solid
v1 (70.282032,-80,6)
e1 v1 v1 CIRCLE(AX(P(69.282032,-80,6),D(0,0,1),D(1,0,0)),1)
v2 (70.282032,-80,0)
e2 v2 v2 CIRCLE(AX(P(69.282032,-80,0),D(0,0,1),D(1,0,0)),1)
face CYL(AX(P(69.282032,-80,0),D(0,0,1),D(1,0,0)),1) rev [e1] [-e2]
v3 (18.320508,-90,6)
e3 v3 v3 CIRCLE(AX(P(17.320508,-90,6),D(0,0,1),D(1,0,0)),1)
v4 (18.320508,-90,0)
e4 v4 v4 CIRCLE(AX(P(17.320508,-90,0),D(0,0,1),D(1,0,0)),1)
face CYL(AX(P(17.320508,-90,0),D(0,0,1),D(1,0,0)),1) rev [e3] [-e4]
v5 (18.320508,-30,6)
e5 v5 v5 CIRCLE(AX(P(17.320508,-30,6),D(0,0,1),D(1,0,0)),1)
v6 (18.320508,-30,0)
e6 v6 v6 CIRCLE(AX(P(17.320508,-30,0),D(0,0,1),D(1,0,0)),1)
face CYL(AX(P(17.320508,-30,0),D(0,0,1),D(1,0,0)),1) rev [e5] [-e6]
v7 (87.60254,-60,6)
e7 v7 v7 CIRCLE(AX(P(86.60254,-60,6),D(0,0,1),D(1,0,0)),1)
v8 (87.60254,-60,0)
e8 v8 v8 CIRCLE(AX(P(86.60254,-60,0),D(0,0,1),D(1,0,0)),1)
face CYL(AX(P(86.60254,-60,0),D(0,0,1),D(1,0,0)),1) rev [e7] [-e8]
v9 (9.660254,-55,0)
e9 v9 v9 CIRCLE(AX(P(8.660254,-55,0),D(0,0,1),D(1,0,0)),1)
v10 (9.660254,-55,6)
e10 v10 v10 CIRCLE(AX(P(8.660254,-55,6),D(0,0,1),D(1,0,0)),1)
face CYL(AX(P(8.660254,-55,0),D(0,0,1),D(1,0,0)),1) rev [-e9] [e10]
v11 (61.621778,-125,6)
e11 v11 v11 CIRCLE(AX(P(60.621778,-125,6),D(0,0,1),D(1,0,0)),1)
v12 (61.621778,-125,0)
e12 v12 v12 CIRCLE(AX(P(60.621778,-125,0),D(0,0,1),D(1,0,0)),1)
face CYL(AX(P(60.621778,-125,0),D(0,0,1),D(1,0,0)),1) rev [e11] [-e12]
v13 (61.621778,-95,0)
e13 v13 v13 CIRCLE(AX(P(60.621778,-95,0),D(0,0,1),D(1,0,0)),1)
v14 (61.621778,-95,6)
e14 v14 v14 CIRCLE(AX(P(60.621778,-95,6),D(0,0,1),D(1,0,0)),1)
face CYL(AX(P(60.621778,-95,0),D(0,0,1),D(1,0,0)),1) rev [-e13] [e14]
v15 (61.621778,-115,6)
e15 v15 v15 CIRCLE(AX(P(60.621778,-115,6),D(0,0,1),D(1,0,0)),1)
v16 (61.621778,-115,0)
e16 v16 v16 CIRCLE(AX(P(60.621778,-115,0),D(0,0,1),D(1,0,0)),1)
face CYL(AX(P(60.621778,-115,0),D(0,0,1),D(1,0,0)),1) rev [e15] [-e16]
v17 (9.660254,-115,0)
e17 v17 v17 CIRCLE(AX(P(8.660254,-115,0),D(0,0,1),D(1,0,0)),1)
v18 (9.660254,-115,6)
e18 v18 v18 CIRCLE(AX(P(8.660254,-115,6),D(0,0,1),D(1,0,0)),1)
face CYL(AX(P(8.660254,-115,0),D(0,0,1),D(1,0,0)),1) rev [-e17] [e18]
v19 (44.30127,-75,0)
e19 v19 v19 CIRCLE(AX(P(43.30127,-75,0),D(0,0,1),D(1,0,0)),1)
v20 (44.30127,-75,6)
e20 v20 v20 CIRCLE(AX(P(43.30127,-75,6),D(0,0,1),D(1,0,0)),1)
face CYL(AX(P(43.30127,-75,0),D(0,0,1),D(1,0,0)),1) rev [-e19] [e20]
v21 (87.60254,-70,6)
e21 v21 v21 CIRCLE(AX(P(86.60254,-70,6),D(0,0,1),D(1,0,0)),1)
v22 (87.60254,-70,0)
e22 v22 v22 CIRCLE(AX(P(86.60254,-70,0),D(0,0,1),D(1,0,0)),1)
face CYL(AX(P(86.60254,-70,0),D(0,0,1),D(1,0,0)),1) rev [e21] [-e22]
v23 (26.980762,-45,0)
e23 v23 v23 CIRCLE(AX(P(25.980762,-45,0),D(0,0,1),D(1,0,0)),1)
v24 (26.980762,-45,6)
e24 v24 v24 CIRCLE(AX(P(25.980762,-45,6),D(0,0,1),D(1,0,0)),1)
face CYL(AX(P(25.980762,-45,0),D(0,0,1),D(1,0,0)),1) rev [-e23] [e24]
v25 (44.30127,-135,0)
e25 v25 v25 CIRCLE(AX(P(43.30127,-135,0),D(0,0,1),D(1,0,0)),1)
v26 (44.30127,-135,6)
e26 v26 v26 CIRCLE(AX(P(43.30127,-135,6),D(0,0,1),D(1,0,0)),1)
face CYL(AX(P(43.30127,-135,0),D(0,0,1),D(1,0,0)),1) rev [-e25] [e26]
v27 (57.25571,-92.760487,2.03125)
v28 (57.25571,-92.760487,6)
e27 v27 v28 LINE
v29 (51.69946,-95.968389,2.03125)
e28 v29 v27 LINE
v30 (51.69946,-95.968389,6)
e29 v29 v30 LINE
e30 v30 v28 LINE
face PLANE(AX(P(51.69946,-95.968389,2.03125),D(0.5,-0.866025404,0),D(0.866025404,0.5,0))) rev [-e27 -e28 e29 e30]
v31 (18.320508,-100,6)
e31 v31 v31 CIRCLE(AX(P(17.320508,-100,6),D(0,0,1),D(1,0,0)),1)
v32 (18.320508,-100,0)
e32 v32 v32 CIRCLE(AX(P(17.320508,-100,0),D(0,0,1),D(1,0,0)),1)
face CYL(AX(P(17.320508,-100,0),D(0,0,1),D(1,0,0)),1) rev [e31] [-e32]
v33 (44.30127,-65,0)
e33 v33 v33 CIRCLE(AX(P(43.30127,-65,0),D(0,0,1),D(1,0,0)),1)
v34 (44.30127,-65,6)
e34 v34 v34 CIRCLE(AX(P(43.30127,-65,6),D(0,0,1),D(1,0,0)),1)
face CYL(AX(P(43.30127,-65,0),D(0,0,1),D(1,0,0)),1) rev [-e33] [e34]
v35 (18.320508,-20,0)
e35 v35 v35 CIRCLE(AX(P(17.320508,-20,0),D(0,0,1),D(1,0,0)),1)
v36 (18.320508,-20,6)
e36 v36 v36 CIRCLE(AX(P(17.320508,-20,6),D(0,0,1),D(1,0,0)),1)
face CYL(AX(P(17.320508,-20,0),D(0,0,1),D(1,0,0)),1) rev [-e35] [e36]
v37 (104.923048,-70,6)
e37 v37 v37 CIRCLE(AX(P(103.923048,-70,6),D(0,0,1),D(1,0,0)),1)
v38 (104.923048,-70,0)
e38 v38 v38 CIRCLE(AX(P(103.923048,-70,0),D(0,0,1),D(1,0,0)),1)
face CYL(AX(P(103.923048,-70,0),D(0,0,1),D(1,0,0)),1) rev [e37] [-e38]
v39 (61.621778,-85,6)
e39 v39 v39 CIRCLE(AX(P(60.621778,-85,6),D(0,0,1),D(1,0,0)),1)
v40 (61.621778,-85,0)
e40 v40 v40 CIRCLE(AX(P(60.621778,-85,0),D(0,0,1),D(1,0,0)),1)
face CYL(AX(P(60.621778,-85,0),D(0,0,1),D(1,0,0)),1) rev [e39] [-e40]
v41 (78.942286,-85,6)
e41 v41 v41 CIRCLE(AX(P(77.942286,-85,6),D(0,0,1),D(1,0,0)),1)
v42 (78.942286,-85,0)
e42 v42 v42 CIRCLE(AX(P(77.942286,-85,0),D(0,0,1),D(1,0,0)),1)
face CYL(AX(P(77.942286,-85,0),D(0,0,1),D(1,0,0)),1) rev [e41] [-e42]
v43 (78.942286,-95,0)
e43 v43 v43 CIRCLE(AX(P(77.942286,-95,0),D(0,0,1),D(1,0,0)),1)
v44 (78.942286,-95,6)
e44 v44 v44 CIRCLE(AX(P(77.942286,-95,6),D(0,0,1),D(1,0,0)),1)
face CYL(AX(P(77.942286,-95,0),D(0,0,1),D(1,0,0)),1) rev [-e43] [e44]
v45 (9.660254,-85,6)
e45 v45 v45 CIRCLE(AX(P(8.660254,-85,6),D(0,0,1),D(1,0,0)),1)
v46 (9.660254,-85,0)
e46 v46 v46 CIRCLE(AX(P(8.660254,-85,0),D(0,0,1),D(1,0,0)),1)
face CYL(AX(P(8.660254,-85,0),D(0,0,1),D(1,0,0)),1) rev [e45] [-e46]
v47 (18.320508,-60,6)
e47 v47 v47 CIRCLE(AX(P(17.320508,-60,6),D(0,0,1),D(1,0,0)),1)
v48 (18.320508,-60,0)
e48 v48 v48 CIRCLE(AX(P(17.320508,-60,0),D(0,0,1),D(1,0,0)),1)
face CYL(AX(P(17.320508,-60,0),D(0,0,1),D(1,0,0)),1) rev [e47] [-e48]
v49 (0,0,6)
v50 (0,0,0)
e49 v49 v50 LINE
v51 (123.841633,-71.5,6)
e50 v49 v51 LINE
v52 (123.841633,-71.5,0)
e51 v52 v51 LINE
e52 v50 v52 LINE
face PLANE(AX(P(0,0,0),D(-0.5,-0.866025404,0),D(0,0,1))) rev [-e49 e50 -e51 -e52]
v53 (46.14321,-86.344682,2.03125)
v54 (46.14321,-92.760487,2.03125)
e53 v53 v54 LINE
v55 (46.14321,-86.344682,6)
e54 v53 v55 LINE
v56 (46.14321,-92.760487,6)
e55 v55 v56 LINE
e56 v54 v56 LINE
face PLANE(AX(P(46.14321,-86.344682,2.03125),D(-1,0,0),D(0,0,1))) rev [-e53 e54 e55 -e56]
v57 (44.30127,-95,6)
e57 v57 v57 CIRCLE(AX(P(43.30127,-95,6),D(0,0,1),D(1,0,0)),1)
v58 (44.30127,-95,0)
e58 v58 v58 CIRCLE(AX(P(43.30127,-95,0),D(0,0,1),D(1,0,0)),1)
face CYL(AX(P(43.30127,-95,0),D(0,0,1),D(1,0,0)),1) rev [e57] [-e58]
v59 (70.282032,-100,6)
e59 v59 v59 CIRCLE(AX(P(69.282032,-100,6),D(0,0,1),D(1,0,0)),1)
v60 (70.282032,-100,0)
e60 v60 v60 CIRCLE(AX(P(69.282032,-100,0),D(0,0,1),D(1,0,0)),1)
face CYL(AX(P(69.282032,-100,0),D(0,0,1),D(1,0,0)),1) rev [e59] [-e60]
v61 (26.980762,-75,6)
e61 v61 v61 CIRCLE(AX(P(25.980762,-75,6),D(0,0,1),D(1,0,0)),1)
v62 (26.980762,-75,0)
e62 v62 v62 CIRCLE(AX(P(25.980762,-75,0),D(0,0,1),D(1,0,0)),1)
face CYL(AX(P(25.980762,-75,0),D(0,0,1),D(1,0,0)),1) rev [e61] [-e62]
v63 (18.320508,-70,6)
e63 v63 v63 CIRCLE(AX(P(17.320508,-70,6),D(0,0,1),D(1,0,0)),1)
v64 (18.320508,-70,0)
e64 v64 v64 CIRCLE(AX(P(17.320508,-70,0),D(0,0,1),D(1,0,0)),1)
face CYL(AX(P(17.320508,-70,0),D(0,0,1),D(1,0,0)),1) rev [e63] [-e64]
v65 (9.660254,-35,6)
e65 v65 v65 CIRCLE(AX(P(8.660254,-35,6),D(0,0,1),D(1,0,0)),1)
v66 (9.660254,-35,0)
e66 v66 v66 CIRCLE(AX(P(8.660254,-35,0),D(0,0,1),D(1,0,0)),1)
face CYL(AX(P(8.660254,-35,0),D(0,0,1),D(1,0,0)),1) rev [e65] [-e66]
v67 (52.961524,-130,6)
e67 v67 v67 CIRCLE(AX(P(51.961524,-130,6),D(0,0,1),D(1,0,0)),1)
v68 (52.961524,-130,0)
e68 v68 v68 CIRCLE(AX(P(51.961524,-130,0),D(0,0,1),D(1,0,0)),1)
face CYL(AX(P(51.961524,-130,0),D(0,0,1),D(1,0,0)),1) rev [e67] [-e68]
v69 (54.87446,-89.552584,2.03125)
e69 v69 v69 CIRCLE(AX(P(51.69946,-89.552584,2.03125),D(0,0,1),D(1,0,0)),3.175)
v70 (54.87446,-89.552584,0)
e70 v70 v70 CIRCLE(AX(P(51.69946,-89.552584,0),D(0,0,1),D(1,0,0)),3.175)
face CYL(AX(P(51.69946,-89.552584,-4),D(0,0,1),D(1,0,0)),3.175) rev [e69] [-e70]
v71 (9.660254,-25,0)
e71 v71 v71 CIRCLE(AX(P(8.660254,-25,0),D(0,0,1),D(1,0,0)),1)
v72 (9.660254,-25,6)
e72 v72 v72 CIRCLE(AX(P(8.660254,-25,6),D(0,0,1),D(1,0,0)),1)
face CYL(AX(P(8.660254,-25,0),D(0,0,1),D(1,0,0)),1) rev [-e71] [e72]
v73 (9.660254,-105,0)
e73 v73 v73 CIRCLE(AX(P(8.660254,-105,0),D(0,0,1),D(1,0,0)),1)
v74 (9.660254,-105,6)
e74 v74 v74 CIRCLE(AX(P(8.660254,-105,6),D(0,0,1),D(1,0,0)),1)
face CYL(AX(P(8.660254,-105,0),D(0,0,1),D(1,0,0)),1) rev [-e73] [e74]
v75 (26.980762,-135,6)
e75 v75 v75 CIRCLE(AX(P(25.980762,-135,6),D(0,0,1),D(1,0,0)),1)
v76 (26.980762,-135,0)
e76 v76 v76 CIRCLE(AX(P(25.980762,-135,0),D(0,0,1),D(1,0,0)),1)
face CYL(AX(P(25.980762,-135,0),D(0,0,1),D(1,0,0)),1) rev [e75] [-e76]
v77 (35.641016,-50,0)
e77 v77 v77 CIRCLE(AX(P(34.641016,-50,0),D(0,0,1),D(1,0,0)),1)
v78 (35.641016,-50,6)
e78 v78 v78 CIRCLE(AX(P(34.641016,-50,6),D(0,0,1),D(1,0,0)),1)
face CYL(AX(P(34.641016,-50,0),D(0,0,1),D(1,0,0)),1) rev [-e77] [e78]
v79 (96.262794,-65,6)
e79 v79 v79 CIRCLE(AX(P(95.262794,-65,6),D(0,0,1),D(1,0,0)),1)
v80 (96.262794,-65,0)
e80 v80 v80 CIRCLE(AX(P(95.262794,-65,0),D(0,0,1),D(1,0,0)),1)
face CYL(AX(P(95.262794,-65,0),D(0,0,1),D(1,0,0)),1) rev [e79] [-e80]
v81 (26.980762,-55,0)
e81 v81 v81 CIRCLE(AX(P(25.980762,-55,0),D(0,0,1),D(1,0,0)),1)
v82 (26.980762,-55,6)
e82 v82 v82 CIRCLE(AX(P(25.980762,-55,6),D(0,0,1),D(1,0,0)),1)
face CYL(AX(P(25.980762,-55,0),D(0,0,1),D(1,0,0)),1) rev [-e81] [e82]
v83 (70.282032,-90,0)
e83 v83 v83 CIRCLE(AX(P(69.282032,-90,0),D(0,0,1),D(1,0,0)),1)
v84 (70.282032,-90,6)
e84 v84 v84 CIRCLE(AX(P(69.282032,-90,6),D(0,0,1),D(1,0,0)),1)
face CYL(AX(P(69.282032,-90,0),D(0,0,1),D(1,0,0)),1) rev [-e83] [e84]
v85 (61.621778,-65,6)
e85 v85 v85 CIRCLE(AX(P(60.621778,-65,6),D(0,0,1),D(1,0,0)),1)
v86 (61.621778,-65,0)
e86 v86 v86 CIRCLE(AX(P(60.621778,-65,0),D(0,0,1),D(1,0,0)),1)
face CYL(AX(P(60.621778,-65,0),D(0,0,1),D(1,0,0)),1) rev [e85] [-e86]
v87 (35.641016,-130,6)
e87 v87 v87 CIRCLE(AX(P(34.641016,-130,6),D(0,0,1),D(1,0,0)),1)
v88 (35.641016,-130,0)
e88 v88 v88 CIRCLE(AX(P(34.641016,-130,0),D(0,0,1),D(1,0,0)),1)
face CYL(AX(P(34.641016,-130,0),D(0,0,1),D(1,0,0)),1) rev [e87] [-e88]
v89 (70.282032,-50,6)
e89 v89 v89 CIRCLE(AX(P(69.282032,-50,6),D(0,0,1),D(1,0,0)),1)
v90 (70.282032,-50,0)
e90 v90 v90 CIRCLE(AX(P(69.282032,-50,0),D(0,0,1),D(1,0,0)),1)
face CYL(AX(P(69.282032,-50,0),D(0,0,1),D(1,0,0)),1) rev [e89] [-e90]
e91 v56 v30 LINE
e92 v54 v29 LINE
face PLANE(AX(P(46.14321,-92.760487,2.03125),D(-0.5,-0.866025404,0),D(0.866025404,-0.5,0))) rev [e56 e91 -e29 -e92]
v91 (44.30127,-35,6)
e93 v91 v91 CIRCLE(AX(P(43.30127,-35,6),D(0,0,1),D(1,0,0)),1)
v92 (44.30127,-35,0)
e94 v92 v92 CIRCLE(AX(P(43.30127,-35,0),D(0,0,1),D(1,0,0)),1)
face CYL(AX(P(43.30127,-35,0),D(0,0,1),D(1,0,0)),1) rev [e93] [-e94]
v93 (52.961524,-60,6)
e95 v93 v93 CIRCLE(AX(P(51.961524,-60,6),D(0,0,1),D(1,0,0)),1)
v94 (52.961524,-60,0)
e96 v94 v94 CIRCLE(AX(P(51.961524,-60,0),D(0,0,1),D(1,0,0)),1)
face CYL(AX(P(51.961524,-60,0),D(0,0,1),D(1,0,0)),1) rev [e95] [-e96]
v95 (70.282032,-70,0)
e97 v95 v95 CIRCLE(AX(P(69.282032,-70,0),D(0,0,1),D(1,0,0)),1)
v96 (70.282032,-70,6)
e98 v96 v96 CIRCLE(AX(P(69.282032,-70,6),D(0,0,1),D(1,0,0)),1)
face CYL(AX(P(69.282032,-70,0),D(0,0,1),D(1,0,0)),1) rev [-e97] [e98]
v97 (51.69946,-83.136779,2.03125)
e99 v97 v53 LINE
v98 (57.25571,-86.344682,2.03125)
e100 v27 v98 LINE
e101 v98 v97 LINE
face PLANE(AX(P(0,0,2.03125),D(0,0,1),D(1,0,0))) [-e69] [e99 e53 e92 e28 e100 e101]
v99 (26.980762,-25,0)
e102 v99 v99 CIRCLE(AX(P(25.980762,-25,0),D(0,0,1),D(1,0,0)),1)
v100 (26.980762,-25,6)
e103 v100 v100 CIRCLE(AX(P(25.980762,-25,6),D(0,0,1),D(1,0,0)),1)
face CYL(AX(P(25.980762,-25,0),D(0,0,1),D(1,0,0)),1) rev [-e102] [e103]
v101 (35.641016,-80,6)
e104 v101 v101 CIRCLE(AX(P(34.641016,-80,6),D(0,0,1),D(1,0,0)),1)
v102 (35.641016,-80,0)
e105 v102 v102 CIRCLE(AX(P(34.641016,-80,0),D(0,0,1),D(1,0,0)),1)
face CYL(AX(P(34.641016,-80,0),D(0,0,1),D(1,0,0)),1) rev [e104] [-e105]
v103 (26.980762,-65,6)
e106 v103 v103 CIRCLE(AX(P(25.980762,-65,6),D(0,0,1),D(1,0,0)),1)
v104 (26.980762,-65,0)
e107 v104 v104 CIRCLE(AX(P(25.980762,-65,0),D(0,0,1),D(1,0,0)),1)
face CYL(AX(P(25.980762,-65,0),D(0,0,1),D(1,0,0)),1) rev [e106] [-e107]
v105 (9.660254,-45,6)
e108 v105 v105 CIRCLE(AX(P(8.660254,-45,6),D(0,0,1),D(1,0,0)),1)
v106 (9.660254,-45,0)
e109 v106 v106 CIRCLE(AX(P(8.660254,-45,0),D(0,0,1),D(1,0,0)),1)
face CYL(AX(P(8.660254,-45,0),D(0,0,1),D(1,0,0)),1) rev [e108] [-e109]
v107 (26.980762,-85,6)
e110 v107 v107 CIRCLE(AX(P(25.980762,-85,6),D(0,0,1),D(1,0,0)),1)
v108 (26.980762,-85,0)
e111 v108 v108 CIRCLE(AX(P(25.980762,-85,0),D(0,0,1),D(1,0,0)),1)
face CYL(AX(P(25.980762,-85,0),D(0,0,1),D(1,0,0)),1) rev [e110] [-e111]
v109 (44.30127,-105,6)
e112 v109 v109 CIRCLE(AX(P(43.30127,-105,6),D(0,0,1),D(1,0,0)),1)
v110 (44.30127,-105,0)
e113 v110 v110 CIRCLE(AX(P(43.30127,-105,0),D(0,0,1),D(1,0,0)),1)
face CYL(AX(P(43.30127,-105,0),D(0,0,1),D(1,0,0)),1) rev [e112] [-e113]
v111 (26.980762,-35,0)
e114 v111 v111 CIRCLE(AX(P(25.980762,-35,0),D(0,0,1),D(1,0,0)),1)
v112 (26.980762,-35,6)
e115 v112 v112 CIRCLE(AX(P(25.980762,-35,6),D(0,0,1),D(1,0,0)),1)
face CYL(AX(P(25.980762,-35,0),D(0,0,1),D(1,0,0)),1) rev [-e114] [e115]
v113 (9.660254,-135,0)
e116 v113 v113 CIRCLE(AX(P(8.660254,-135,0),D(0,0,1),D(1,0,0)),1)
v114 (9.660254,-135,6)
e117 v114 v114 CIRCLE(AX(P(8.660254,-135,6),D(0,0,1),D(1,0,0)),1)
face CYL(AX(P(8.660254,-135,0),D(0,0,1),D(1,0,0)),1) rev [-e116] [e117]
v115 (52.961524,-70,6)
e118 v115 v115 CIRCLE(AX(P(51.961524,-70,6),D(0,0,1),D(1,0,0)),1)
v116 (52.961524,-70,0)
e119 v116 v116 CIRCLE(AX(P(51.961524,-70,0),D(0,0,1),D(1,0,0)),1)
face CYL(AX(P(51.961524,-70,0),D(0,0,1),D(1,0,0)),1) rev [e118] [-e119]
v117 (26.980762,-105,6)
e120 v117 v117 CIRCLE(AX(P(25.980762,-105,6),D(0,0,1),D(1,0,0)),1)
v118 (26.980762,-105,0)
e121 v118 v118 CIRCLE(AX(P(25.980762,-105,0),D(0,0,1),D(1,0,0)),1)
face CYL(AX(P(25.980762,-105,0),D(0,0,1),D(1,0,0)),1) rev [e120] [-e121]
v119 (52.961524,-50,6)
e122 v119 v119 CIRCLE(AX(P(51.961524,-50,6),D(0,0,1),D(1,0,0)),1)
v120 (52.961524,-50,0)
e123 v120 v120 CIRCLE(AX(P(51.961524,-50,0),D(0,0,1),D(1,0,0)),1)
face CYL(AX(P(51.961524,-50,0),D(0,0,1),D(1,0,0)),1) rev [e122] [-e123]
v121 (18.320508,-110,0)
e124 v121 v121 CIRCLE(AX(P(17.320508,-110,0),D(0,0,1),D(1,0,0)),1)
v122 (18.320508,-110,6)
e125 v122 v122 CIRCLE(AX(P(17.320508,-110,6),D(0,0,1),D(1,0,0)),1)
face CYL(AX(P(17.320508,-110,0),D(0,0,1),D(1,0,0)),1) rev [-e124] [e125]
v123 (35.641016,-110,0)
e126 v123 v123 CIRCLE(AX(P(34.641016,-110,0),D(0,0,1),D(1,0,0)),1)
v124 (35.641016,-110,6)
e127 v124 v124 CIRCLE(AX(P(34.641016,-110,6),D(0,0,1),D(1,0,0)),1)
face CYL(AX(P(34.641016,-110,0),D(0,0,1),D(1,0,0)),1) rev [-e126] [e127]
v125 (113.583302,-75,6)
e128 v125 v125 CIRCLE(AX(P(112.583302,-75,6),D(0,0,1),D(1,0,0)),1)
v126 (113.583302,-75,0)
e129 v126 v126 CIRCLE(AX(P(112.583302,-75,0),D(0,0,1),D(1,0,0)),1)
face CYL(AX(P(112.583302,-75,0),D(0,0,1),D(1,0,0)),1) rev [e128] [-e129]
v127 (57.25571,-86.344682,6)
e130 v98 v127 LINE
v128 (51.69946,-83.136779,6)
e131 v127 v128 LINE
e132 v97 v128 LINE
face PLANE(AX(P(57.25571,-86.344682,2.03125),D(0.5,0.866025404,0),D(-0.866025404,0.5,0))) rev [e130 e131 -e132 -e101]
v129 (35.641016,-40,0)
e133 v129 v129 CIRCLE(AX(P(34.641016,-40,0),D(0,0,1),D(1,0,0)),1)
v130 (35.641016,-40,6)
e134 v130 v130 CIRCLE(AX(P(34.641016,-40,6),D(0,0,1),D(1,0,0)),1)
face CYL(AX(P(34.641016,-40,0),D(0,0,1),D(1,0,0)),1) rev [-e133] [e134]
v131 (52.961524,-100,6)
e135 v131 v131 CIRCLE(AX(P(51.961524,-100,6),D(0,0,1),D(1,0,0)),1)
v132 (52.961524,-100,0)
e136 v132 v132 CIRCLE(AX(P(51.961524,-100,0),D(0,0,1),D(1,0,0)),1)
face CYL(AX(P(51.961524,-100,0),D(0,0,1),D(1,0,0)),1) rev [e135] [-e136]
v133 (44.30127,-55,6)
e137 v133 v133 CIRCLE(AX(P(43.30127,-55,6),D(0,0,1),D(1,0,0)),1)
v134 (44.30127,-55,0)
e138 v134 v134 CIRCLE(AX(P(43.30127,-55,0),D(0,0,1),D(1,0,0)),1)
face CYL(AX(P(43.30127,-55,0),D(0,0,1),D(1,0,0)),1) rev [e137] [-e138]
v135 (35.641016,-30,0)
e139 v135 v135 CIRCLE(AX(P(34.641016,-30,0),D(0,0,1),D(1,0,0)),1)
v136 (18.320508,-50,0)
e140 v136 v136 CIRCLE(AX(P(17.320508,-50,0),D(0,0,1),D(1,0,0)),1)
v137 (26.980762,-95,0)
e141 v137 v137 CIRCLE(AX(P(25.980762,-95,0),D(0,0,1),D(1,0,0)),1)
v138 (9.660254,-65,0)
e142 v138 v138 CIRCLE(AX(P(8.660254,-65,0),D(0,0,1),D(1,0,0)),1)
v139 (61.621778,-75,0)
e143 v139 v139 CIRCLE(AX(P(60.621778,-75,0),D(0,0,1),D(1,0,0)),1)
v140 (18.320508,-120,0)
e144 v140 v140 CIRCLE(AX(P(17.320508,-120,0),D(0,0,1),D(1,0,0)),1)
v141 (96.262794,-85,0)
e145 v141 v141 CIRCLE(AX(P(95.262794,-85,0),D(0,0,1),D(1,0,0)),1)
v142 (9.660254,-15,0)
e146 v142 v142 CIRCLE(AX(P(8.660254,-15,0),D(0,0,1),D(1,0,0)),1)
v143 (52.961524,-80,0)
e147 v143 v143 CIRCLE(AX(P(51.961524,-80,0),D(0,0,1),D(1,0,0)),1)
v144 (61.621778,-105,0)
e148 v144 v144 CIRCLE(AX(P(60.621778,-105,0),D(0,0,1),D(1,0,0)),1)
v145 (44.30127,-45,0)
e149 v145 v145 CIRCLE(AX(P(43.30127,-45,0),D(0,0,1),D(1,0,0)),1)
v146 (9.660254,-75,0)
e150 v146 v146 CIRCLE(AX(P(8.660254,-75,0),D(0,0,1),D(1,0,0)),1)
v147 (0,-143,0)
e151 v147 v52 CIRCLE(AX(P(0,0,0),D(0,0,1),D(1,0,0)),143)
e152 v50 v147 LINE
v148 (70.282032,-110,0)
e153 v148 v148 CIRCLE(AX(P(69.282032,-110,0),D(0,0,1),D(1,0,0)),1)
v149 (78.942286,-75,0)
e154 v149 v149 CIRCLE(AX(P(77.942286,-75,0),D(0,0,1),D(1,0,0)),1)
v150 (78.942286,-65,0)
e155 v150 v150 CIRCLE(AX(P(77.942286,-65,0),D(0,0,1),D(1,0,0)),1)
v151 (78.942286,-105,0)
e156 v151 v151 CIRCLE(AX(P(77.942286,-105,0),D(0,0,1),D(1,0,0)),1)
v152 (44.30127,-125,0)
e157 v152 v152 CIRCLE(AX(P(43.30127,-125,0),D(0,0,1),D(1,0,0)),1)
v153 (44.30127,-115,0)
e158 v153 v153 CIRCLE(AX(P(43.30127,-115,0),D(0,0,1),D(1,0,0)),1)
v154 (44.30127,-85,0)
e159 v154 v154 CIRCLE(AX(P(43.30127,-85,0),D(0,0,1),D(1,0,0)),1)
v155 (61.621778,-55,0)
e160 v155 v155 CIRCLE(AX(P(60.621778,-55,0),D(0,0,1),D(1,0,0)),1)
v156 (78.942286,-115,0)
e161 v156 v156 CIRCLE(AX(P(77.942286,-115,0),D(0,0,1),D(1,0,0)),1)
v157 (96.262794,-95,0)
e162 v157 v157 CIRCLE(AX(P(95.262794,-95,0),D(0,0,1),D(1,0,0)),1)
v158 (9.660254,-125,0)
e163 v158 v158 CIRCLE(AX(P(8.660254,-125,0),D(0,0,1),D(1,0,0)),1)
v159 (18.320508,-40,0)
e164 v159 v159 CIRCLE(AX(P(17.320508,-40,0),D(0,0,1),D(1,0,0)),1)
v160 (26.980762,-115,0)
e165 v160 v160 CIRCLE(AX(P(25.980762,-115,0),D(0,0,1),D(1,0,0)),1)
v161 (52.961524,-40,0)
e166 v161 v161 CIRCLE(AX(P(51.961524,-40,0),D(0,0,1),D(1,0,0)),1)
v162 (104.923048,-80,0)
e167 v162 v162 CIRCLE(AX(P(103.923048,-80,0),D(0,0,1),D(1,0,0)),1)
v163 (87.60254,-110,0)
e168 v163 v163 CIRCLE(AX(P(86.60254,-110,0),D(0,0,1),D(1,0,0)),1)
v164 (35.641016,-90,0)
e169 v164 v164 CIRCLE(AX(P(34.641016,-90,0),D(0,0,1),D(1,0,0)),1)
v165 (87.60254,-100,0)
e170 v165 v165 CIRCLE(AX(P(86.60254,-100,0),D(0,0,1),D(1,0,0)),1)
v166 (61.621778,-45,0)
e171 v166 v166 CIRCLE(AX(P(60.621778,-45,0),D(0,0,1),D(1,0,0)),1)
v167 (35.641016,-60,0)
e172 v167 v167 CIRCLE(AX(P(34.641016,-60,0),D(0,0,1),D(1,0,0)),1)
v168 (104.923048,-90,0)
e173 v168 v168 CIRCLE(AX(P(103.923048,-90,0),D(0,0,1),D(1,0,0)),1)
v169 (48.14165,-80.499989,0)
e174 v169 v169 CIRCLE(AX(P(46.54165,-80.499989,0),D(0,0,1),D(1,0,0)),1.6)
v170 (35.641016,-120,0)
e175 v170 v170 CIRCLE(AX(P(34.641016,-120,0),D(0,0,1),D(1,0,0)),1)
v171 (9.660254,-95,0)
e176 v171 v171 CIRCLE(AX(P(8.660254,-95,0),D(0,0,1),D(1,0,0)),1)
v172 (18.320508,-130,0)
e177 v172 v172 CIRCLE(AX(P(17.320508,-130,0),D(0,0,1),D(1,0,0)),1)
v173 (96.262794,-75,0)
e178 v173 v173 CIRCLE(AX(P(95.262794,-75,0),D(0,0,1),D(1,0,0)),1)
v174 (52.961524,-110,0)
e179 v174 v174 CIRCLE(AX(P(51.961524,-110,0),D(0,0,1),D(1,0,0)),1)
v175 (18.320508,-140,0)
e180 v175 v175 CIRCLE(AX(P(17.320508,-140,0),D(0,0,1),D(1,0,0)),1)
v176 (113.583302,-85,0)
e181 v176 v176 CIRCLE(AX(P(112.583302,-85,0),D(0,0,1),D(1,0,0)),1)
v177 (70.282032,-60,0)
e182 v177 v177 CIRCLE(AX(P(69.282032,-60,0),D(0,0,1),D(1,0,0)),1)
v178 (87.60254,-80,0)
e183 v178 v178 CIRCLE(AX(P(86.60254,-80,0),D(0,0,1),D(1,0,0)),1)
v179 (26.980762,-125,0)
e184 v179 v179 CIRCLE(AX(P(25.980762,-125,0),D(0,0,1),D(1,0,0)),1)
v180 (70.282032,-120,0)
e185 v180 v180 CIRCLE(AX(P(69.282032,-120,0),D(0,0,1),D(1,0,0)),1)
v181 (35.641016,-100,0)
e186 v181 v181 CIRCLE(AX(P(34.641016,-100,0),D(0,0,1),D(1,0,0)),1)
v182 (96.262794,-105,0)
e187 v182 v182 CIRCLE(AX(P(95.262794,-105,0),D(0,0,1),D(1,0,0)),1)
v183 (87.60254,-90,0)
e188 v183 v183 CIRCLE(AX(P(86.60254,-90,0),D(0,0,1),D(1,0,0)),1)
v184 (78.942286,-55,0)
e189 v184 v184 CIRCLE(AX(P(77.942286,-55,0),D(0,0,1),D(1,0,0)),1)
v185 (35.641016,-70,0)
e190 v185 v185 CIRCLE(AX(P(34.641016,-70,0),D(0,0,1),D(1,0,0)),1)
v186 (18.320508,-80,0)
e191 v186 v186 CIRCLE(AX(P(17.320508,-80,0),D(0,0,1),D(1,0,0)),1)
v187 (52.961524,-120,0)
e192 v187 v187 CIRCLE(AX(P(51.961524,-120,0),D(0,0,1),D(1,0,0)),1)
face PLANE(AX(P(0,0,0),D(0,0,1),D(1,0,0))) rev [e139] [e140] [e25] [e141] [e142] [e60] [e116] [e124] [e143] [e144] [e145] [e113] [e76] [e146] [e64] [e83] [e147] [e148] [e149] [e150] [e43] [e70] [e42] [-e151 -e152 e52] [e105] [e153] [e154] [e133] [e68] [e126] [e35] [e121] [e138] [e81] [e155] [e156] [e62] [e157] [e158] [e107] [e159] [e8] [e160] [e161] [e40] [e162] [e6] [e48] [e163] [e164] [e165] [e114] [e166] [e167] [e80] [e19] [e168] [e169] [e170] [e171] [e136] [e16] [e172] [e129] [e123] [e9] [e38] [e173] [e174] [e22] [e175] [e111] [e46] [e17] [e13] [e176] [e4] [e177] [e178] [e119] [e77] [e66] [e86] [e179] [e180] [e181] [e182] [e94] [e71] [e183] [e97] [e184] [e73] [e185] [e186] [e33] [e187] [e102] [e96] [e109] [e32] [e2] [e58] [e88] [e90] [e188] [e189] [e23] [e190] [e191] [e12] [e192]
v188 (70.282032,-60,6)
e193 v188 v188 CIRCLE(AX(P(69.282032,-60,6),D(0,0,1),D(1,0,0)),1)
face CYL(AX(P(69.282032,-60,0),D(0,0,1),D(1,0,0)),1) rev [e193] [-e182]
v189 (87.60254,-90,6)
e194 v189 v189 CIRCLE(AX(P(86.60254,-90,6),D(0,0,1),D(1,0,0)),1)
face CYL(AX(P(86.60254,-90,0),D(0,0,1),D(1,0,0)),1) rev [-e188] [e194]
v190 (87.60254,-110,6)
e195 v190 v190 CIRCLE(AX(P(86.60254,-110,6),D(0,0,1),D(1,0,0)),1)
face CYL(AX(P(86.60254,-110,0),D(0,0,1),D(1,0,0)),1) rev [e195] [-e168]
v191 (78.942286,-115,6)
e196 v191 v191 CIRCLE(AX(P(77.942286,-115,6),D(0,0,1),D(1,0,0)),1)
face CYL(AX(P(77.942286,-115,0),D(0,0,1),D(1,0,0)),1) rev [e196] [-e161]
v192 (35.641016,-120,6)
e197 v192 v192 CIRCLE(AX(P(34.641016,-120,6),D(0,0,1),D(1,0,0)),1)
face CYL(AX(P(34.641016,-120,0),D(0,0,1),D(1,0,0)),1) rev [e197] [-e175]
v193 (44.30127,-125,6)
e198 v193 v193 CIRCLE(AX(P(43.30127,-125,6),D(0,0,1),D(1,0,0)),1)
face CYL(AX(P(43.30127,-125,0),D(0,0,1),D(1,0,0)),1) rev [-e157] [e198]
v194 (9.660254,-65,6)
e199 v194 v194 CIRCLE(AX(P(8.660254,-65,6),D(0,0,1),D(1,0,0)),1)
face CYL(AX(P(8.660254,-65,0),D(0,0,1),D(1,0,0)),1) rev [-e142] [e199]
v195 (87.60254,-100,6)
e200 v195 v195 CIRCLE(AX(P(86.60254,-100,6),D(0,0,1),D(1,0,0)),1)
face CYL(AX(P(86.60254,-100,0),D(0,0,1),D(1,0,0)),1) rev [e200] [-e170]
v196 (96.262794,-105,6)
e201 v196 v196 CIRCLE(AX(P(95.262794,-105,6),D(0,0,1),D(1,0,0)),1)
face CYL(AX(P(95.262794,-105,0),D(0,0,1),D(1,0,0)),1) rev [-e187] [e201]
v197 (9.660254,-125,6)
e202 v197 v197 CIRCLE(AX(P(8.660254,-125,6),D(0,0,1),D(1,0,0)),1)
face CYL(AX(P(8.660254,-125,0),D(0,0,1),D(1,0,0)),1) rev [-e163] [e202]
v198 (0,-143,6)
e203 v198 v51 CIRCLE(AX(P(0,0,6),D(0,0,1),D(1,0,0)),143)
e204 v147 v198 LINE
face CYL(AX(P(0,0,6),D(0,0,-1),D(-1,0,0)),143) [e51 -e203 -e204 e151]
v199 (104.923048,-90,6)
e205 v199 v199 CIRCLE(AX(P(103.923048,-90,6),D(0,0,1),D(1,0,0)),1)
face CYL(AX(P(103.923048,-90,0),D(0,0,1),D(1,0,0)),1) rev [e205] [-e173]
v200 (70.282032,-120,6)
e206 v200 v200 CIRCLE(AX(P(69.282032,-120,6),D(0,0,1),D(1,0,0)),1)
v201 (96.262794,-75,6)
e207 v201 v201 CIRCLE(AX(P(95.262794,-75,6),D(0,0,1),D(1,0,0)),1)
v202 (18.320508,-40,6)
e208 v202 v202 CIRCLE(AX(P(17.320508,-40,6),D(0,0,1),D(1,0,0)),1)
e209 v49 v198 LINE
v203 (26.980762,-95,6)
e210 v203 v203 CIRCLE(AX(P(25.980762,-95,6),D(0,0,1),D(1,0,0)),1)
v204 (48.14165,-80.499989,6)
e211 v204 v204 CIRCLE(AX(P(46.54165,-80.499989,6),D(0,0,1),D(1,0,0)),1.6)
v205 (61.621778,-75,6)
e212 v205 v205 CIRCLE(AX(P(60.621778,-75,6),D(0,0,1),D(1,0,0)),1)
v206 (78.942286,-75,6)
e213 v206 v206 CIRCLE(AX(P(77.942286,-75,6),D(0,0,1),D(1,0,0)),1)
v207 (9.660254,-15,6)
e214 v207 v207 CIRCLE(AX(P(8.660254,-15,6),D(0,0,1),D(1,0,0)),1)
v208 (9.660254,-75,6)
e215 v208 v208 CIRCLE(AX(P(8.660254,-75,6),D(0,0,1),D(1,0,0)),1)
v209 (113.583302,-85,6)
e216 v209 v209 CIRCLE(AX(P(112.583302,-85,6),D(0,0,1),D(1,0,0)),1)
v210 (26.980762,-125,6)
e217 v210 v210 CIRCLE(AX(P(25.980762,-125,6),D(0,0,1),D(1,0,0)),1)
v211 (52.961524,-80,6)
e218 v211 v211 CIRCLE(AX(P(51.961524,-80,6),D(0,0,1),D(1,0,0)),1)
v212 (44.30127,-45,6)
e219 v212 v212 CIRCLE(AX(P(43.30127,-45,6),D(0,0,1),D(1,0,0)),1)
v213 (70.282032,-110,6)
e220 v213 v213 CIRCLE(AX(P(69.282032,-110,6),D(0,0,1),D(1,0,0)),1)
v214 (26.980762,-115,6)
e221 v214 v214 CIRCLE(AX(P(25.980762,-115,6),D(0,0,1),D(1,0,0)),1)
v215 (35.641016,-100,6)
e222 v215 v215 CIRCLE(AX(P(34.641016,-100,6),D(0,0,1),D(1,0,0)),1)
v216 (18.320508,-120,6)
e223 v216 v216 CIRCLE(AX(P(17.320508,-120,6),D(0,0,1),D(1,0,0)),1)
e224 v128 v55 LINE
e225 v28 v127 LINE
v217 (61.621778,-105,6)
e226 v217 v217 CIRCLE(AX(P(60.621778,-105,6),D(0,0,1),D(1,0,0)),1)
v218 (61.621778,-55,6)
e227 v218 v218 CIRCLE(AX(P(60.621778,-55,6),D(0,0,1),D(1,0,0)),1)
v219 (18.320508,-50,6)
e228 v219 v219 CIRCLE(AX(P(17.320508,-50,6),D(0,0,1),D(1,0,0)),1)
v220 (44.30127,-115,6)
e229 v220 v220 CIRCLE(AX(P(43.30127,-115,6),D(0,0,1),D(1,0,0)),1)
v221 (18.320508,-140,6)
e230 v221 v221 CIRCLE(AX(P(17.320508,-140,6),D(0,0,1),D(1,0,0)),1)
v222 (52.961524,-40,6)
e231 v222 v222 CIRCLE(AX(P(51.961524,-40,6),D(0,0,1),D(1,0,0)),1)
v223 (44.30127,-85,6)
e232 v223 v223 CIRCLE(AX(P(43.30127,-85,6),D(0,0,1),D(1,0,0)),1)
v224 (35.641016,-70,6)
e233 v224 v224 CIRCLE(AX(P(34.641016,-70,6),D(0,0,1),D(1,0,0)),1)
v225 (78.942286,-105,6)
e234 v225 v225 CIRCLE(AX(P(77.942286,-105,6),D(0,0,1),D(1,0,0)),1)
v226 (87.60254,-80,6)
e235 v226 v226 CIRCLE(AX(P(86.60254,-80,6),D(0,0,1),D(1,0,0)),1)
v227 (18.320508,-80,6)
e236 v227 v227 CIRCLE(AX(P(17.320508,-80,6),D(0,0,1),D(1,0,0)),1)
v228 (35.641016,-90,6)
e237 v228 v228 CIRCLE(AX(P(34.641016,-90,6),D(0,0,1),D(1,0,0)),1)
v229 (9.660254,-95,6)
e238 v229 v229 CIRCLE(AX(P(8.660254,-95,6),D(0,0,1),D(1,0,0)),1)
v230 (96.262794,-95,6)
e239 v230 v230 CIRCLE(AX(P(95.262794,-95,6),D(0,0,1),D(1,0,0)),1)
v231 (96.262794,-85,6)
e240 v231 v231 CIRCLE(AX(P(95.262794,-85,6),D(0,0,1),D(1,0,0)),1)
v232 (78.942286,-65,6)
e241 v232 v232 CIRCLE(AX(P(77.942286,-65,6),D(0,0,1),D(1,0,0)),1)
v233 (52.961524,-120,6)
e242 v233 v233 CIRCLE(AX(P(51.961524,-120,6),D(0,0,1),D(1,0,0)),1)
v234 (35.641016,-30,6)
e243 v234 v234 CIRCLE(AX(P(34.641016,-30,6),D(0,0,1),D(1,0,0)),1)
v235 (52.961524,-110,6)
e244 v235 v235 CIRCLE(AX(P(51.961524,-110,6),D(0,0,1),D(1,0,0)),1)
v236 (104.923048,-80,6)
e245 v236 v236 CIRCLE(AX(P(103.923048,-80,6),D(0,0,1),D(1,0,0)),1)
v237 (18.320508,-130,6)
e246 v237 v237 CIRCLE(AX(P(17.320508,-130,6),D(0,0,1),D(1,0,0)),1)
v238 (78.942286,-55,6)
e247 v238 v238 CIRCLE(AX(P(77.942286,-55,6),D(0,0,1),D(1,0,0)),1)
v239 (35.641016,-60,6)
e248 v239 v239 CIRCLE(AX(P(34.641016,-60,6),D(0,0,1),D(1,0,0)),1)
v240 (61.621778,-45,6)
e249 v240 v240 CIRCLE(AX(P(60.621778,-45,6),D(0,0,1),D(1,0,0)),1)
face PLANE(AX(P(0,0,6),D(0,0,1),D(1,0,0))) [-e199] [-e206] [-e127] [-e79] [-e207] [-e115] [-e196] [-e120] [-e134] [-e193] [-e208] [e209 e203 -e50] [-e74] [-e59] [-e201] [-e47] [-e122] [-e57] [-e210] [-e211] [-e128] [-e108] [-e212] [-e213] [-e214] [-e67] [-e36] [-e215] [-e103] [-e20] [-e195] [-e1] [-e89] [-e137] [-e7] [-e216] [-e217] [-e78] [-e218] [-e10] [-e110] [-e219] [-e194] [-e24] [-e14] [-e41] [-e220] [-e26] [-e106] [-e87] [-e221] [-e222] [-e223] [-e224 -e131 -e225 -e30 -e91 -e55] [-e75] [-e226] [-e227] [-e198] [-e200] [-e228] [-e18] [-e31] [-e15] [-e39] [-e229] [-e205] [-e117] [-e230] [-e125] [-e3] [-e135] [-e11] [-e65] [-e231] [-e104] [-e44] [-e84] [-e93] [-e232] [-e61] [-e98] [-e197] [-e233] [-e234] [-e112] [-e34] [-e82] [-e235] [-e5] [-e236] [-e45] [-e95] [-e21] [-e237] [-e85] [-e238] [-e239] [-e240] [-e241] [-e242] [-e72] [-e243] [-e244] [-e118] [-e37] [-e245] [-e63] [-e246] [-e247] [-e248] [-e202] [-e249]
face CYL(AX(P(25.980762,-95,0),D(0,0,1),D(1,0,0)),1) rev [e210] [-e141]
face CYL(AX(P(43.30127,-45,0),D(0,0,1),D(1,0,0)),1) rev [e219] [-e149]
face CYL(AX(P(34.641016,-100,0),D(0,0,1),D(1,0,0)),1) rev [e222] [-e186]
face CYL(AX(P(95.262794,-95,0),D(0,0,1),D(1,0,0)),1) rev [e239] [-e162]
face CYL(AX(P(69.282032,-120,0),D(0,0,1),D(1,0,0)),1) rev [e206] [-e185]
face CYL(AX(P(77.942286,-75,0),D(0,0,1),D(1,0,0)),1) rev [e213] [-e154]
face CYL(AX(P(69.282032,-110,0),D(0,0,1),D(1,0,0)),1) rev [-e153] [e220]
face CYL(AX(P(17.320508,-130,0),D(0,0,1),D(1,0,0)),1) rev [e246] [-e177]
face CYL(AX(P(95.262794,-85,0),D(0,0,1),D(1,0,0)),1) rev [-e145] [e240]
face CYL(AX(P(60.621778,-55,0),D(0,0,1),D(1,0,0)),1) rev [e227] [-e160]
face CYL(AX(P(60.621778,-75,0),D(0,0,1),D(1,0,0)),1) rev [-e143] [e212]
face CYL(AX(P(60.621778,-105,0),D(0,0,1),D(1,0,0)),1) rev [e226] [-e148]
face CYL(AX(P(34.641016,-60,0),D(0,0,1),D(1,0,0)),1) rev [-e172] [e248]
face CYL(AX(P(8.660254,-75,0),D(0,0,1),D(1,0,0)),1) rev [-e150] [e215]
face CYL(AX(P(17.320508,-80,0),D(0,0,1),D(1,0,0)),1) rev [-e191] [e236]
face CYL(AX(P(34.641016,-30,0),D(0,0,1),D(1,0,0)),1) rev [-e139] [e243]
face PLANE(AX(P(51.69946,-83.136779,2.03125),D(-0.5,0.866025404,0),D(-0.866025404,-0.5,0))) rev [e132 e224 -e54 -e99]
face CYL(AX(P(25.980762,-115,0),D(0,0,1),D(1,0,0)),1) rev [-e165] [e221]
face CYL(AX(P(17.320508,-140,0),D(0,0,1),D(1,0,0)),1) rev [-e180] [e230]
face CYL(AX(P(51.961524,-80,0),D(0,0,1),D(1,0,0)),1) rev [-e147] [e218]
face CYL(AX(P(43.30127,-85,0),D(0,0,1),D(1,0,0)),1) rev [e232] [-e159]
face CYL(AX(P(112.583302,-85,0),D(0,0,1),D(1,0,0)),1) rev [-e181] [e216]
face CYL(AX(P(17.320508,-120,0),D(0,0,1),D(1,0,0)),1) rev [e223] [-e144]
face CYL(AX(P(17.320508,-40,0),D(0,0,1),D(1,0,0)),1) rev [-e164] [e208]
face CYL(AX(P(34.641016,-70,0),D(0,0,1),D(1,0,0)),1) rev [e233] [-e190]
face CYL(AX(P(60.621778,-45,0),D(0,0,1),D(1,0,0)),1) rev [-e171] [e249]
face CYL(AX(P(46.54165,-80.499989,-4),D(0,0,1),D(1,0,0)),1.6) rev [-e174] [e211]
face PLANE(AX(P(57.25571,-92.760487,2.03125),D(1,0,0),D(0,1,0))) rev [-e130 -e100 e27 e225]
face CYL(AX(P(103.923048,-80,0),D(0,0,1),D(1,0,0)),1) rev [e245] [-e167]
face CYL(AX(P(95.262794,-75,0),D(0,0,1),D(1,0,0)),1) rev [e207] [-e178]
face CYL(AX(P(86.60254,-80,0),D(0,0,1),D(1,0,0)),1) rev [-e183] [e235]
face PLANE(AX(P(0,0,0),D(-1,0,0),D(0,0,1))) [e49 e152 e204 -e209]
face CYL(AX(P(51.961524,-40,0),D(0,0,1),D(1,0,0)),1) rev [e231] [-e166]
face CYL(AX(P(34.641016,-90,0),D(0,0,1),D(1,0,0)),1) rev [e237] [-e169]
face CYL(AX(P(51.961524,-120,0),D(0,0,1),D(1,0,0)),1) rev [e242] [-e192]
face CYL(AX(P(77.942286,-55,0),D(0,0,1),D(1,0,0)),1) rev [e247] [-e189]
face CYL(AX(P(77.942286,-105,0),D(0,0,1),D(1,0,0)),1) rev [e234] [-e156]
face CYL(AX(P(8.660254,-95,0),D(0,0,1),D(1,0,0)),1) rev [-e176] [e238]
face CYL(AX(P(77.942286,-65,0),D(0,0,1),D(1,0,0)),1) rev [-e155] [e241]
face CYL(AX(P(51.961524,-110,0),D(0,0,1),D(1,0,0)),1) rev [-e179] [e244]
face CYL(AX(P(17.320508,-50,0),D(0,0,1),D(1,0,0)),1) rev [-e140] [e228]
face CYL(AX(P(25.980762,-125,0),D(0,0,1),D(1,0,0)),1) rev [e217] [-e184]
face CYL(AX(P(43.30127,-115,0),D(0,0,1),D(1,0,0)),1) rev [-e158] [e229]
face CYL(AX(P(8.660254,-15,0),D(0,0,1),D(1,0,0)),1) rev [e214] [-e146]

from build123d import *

# Parameters (mm, degrees)
SKETCH1_R               = 143
BOSS_EXTRUDE1_DEPTH     = 6
CUT_REVOLVE_THIN2_DEPTH = 6
SKETCH18_R              = 1.6
CUT_EXTRUDE2_DEPTH      = 10
FILL_PATTERN1_OUTLINE_R = 1
FILL_PATTERN1_DEPTH     = 6
CUT_EXTRUDE3_DEPTH      = 3.96875
SKETCH9_R               = 3.175
CUT_EXTRUDE1_DEPTH      = 10


# Read off the part's stored shape, not the designer's step: Cut-Revolve-Thin2, Fill Pattern1
with BuildPart() as part:
    # Sketch1 → Boss-Extrude1 (new body)
    with BuildSketch(Plane.XY):
        Circle(SKETCH1_R)
    extrude(amount=BOSS_EXTRUDE1_DEPTH)

    # Cut-Revolve-Thin2 outline → Cut-Revolve-Thin2 (cut)
    with BuildSketch(Plane.XY):
        with BuildLine():
            Line((0, -143), (0, 0))
            Line((0, 0), (123.841632741, -71.5))
            ThreePointArc((123.841632741, -71.5), (-71.5, 123.841632741), (0, -143))
        make_face()
    extrude(amount=CUT_REVOLVE_THIN2_DEPTH, mode=Mode.SUBTRACT)

    # Sketch18 → Cut-Extrude2 (cut)
    with BuildSketch(Plane.XY.offset(6)):
        with Locations((46.541650131, -80.499989045)):
            Circle(SKETCH18_R)
    extrude(amount=-CUT_EXTRUDE2_DEPTH, mode=Mode.SUBTRACT)

    # Fill Pattern1 outline → Fill Pattern1 (cut)
    with BuildSketch(Plane.XY):
        with Locations((34.641016151, -110)):
            Circle(FILL_PATTERN1_OUTLINE_R)
        with Locations((34.641016151, -100)):
            Circle(FILL_PATTERN1_OUTLINE_R)
        with Locations((34.641016151, -90)):
            Circle(FILL_PATTERN1_OUTLINE_R)
        with Locations((34.641016151, -80)):
            Circle(FILL_PATTERN1_OUTLINE_R)
        with Locations((34.641016151, -70)):
            Circle(FILL_PATTERN1_OUTLINE_R)
        with Locations((34.641016151, -60)):
            Circle(FILL_PATTERN1_OUTLINE_R)
        with Locations((34.641016151, -50)):
            Circle(FILL_PATTERN1_OUTLINE_R)
        with Locations((34.641016151, -40)):
            Circle(FILL_PATTERN1_OUTLINE_R)
        with Locations((25.980762114, -85)):
            Circle(FILL_PATTERN1_OUTLINE_R)
        with Locations((25.980762114, -95)):
            Circle(FILL_PATTERN1_OUTLINE_R)
        with Locations((25.980762114, -105)):
            Circle(FILL_PATTERN1_OUTLINE_R)
        with Locations((25.980762114, -115)):
            Circle(FILL_PATTERN1_OUTLINE_R)
        with Locations((34.641016151, -30)):
            Circle(FILL_PATTERN1_OUTLINE_R)
        with Locations((25.980762114, -135)):
            Circle(FILL_PATTERN1_OUTLINE_R)
        with Locations((25.980762114, -125)):
            Circle(FILL_PATTERN1_OUTLINE_R)
        with Locations((43.301270189, -85)):
            Circle(FILL_PATTERN1_OUTLINE_R)
        with Locations((43.301270189, -95)):
            Circle(FILL_PATTERN1_OUTLINE_R)
        with Locations((43.301270189, -105)):
            Circle(FILL_PATTERN1_OUTLINE_R)
        with Locations((43.301270189, -115)):
            Circle(FILL_PATTERN1_OUTLINE_R)
        with Locations((43.301270189, -125)):
            Circle(FILL_PATTERN1_OUTLINE_R)
        with Locations((43.301270189, -135)):
            Circle(FILL_PATTERN1_OUTLINE_R)
        with Locations((51.961524227, -40)):
            Circle(FILL_PATTERN1_OUTLINE_R)
        with Locations((51.961524227, -50)):
            Circle(FILL_PATTERN1_OUTLINE_R)
        with Locations((43.301270189, -35)):
            Circle(FILL_PATTERN1_OUTLINE_R)
        with Locations((34.641016151, -130)):
            Circle(FILL_PATTERN1_OUTLINE_R)
        with Locations((34.641016151, -120)):
            Circle(FILL_PATTERN1_OUTLINE_R)
        with Locations((43.301270189, -45)):
            Circle(FILL_PATTERN1_OUTLINE_R)
        with Locations((43.301270189, -55)):
            Circle(FILL_PATTERN1_OUTLINE_R)
        with Locations((43.301270189, -65)):
            Circle(FILL_PATTERN1_OUTLINE_R)
        with Locations((43.301270189, -75)):
            Circle(FILL_PATTERN1_OUTLINE_R)
        with Locations((8.660254038, -105)):
            Circle(FILL_PATTERN1_OUTLINE_R)
        with Locations((8.660254038, -115)):
            Circle(FILL_PATTERN1_OUTLINE_R)
        with Locations((8.660254038, -125)):
            Circle(FILL_PATTERN1_OUTLINE_R)
        with Locations((8.660254038, -135)):
            Circle(FILL_PATTERN1_OUTLINE_R)
        with Locations((17.320508076, -40)):
            Circle(FILL_PATTERN1_OUTLINE_R)
        with Locations((17.320508076, -30)):
            Circle(FILL_PATTERN1_OUTLINE_R)
        with Locations((17.320508076, -20)):
            Circle(FILL_PATTERN1_OUTLINE_R)
        with Locations((8.660254038, -95)):
            Circle(FILL_PATTERN1_OUTLINE_R)
        with Locations((8.660254038, -85)):
            Circle(FILL_PATTERN1_OUTLINE_R)
        with Locations((8.660254038, -75)):
            Circle(FILL_PATTERN1_OUTLINE_R)
        with Locations((8.660254038, -65)):
            Circle(FILL_PATTERN1_OUTLINE_R)
        with Locations((8.660254038, -55)):
            Circle(FILL_PATTERN1_OUTLINE_R)
        with Locations((8.660254038, -45)):
            Circle(FILL_PATTERN1_OUTLINE_R)
        with Locations((8.660254038, -35)):
            Circle(FILL_PATTERN1_OUTLINE_R)
        with Locations((8.660254038, -25)):
            Circle(FILL_PATTERN1_OUTLINE_R)
        with Locations((17.320508076, -130)):
            Circle(FILL_PATTERN1_OUTLINE_R)
        with Locations((17.320508076, -140)):
            Circle(FILL_PATTERN1_OUTLINE_R)
        with Locations((25.980762114, -25)):
            Circle(FILL_PATTERN1_OUTLINE_R)
        with Locations((25.980762114, -35)):
            Circle(FILL_PATTERN1_OUTLINE_R)
        with Locations((25.980762114, -45)):
            Circle(FILL_PATTERN1_OUTLINE_R)
        with Locations((25.980762114, -55)):
            Circle(FILL_PATTERN1_OUTLINE_R)
        with Locations((25.980762114, -65)):
            Circle(FILL_PATTERN1_OUTLINE_R)
        with Locations((25.980762114, -75)):
            Circle(FILL_PATTERN1_OUTLINE_R)
        with Locations((17.320508076, -120)):
            Circle(FILL_PATTERN1_OUTLINE_R)
        with Locations((17.320508076, -110)):
            Circle(FILL_PATTERN1_OUTLINE_R)
        with Locations((17.320508076, -100)):
            Circle(FILL_PATTERN1_OUTLINE_R)
        with Locations((17.320508076, -90)):
            Circle(FILL_PATTERN1_OUTLINE_R)
        with Locations((17.320508076, -80)):
            Circle(FILL_PATTERN1_OUTLINE_R)
        with Locations((17.320508076, -70)):
            Circle(FILL_PATTERN1_OUTLINE_R)
        with Locations((17.320508076, -60)):
            Circle(FILL_PATTERN1_OUTLINE_R)
        with Locations((17.320508076, -50)):
            Circle(FILL_PATTERN1_OUTLINE_R)
        with Locations((95.262794416, -65)):
            Circle(FILL_PATTERN1_OUTLINE_R)
        with Locations((86.602540378, -110)):
            Circle(FILL_PATTERN1_OUTLINE_R)
        with Locations((86.602540378, -100)):
            Circle(FILL_PATTERN1_OUTLINE_R)
        with Locations((95.262794416, -75)):
            Circle(FILL_PATTERN1_OUTLINE_R)
        with Locations((95.262794416, -85)):
            Circle(FILL_PATTERN1_OUTLINE_R)
        with Locations((95.262794416, -95)):
            Circle(FILL_PATTERN1_OUTLINE_R)
        with Locations((95.262794416, -105)):
            Circle(FILL_PATTERN1_OUTLINE_R)
        with Locations((86.602540378, -90)):
            Circle(FILL_PATTERN1_OUTLINE_R)
        with Locations((86.602540378, -80)):
            Circle(FILL_PATTERN1_OUTLINE_R)
        with Locations((86.602540378, -70)):
            Circle(FILL_PATTERN1_OUTLINE_R)
        with Locations((86.602540378, -60)):
            Circle(FILL_PATTERN1_OUTLINE_R)
        with Locations((77.942286341, -115)):
            Circle(FILL_PATTERN1_OUTLINE_R)
        with Locations((77.942286341, -105)):
            Circle(FILL_PATTERN1_OUTLINE_R)
        with Locations((77.942286341, -95)):
            Circle(FILL_PATTERN1_OUTLINE_R)
        with Locations((112.583302492, -75)):
            Circle(FILL_PATTERN1_OUTLINE_R)
        with Locations((112.583302492, -85)):
            Circle(FILL_PATTERN1_OUTLINE_R)
        with Locations((103.923048454, -70)):
            Circle(FILL_PATTERN1_OUTLINE_R)
        with Locations((103.923048454, -80)):
            Circle(FILL_PATTERN1_OUTLINE_R)
        with Locations((103.923048454, -90)):
            Circle(FILL_PATTERN1_OUTLINE_R)
        with Locations((60.621778265, -65)):
            Circle(FILL_PATTERN1_OUTLINE_R)
        with Locations((60.621778265, -55)):
            Circle(FILL_PATTERN1_OUTLINE_R)
        with Locations((60.621778265, -45)):
            Circle(FILL_PATTERN1_OUTLINE_R)
        with Locations((60.621778265, -75)):
            Circle(FILL_PATTERN1_OUTLINE_R)
        with Locations((60.621778265, -85)):
            Circle(FILL_PATTERN1_OUTLINE_R)
        with Locations((60.621778265, -95)):
            Circle(FILL_PATTERN1_OUTLINE_R)
        with Locations((60.621778265, -105)):
            Circle(FILL_PATTERN1_OUTLINE_R)
        with Locations((51.961524227, -130)):
            Circle(FILL_PATTERN1_OUTLINE_R)
        with Locations((51.961524227, -120)):
            Circle(FILL_PATTERN1_OUTLINE_R)
        with Locations((51.961524227, -110)):
            Circle(FILL_PATTERN1_OUTLINE_R)
        with Locations((51.961524227, -100)):
            Circle(FILL_PATTERN1_OUTLINE_R)
        with Locations((51.961524227, -90)):
            Circle(FILL_PATTERN1_OUTLINE_R)
        with Locations((51.961524227, -80)):
            Circle(FILL_PATTERN1_OUTLINE_R)
        with Locations((51.961524227, -70)):
            Circle(FILL_PATTERN1_OUTLINE_R)
        with Locations((51.961524227, -60)):
            Circle(FILL_PATTERN1_OUTLINE_R)
        with Locations((77.942286341, -85)):
            Circle(FILL_PATTERN1_OUTLINE_R)
        with Locations((77.942286341, -75)):
            Circle(FILL_PATTERN1_OUTLINE_R)
        with Locations((77.942286341, -65)):
            Circle(FILL_PATTERN1_OUTLINE_R)
        with Locations((77.942286341, -55)):
            Circle(FILL_PATTERN1_OUTLINE_R)
        with Locations((69.282032303, -120)):
            Circle(FILL_PATTERN1_OUTLINE_R)
        with Locations((69.282032303, -110)):
            Circle(FILL_PATTERN1_OUTLINE_R)
        with Locations((69.282032303, -100)):
            Circle(FILL_PATTERN1_OUTLINE_R)
        with Locations((69.282032303, -50)):
            Circle(FILL_PATTERN1_OUTLINE_R)
        with Locations((60.621778265, -125)):
            Circle(FILL_PATTERN1_OUTLINE_R)
        with Locations((60.621778265, -115)):
            Circle(FILL_PATTERN1_OUTLINE_R)
        with Locations((69.282032303, -60)):
            Circle(FILL_PATTERN1_OUTLINE_R)
        with Locations((69.282032303, -70)):
            Circle(FILL_PATTERN1_OUTLINE_R)
        with Locations((69.282032303, -80)):
            Circle(FILL_PATTERN1_OUTLINE_R)
        with Locations((69.282032303, -90)):
            Circle(FILL_PATTERN1_OUTLINE_R)
        with Locations((8.660254038, -15)):
            Circle(FILL_PATTERN1_OUTLINE_R)
    extrude(amount=FILL_PATTERN1_DEPTH, mode=Mode.SUBTRACT)

    # Sketch19 → Cut-Extrude3 (cut)
    with BuildSketch(Plane.XY.offset(6)):
        Polygon((46.143210109, -92.760486747), (51.699460109, -95.968389181), (57.255710109, -92.760486747), (57.255710109, -86.344681881), (51.699460109, -83.136779448), (46.143210109, -86.344681881), align=None)
    extrude(amount=-CUT_EXTRUDE3_DEPTH, mode=Mode.SUBTRACT)

    # Sketch9 → Cut-Extrude1 (cut)
    with BuildSketch(Plane.XY.offset(6)):
        with Locations((51.699460109, -89.552584314)):
            Circle(SKETCH9_R)
    extrude(amount=-CUT_EXTRUDE1_DEPTH, mode=Mode.SUBTRACT)


solid = part.part
